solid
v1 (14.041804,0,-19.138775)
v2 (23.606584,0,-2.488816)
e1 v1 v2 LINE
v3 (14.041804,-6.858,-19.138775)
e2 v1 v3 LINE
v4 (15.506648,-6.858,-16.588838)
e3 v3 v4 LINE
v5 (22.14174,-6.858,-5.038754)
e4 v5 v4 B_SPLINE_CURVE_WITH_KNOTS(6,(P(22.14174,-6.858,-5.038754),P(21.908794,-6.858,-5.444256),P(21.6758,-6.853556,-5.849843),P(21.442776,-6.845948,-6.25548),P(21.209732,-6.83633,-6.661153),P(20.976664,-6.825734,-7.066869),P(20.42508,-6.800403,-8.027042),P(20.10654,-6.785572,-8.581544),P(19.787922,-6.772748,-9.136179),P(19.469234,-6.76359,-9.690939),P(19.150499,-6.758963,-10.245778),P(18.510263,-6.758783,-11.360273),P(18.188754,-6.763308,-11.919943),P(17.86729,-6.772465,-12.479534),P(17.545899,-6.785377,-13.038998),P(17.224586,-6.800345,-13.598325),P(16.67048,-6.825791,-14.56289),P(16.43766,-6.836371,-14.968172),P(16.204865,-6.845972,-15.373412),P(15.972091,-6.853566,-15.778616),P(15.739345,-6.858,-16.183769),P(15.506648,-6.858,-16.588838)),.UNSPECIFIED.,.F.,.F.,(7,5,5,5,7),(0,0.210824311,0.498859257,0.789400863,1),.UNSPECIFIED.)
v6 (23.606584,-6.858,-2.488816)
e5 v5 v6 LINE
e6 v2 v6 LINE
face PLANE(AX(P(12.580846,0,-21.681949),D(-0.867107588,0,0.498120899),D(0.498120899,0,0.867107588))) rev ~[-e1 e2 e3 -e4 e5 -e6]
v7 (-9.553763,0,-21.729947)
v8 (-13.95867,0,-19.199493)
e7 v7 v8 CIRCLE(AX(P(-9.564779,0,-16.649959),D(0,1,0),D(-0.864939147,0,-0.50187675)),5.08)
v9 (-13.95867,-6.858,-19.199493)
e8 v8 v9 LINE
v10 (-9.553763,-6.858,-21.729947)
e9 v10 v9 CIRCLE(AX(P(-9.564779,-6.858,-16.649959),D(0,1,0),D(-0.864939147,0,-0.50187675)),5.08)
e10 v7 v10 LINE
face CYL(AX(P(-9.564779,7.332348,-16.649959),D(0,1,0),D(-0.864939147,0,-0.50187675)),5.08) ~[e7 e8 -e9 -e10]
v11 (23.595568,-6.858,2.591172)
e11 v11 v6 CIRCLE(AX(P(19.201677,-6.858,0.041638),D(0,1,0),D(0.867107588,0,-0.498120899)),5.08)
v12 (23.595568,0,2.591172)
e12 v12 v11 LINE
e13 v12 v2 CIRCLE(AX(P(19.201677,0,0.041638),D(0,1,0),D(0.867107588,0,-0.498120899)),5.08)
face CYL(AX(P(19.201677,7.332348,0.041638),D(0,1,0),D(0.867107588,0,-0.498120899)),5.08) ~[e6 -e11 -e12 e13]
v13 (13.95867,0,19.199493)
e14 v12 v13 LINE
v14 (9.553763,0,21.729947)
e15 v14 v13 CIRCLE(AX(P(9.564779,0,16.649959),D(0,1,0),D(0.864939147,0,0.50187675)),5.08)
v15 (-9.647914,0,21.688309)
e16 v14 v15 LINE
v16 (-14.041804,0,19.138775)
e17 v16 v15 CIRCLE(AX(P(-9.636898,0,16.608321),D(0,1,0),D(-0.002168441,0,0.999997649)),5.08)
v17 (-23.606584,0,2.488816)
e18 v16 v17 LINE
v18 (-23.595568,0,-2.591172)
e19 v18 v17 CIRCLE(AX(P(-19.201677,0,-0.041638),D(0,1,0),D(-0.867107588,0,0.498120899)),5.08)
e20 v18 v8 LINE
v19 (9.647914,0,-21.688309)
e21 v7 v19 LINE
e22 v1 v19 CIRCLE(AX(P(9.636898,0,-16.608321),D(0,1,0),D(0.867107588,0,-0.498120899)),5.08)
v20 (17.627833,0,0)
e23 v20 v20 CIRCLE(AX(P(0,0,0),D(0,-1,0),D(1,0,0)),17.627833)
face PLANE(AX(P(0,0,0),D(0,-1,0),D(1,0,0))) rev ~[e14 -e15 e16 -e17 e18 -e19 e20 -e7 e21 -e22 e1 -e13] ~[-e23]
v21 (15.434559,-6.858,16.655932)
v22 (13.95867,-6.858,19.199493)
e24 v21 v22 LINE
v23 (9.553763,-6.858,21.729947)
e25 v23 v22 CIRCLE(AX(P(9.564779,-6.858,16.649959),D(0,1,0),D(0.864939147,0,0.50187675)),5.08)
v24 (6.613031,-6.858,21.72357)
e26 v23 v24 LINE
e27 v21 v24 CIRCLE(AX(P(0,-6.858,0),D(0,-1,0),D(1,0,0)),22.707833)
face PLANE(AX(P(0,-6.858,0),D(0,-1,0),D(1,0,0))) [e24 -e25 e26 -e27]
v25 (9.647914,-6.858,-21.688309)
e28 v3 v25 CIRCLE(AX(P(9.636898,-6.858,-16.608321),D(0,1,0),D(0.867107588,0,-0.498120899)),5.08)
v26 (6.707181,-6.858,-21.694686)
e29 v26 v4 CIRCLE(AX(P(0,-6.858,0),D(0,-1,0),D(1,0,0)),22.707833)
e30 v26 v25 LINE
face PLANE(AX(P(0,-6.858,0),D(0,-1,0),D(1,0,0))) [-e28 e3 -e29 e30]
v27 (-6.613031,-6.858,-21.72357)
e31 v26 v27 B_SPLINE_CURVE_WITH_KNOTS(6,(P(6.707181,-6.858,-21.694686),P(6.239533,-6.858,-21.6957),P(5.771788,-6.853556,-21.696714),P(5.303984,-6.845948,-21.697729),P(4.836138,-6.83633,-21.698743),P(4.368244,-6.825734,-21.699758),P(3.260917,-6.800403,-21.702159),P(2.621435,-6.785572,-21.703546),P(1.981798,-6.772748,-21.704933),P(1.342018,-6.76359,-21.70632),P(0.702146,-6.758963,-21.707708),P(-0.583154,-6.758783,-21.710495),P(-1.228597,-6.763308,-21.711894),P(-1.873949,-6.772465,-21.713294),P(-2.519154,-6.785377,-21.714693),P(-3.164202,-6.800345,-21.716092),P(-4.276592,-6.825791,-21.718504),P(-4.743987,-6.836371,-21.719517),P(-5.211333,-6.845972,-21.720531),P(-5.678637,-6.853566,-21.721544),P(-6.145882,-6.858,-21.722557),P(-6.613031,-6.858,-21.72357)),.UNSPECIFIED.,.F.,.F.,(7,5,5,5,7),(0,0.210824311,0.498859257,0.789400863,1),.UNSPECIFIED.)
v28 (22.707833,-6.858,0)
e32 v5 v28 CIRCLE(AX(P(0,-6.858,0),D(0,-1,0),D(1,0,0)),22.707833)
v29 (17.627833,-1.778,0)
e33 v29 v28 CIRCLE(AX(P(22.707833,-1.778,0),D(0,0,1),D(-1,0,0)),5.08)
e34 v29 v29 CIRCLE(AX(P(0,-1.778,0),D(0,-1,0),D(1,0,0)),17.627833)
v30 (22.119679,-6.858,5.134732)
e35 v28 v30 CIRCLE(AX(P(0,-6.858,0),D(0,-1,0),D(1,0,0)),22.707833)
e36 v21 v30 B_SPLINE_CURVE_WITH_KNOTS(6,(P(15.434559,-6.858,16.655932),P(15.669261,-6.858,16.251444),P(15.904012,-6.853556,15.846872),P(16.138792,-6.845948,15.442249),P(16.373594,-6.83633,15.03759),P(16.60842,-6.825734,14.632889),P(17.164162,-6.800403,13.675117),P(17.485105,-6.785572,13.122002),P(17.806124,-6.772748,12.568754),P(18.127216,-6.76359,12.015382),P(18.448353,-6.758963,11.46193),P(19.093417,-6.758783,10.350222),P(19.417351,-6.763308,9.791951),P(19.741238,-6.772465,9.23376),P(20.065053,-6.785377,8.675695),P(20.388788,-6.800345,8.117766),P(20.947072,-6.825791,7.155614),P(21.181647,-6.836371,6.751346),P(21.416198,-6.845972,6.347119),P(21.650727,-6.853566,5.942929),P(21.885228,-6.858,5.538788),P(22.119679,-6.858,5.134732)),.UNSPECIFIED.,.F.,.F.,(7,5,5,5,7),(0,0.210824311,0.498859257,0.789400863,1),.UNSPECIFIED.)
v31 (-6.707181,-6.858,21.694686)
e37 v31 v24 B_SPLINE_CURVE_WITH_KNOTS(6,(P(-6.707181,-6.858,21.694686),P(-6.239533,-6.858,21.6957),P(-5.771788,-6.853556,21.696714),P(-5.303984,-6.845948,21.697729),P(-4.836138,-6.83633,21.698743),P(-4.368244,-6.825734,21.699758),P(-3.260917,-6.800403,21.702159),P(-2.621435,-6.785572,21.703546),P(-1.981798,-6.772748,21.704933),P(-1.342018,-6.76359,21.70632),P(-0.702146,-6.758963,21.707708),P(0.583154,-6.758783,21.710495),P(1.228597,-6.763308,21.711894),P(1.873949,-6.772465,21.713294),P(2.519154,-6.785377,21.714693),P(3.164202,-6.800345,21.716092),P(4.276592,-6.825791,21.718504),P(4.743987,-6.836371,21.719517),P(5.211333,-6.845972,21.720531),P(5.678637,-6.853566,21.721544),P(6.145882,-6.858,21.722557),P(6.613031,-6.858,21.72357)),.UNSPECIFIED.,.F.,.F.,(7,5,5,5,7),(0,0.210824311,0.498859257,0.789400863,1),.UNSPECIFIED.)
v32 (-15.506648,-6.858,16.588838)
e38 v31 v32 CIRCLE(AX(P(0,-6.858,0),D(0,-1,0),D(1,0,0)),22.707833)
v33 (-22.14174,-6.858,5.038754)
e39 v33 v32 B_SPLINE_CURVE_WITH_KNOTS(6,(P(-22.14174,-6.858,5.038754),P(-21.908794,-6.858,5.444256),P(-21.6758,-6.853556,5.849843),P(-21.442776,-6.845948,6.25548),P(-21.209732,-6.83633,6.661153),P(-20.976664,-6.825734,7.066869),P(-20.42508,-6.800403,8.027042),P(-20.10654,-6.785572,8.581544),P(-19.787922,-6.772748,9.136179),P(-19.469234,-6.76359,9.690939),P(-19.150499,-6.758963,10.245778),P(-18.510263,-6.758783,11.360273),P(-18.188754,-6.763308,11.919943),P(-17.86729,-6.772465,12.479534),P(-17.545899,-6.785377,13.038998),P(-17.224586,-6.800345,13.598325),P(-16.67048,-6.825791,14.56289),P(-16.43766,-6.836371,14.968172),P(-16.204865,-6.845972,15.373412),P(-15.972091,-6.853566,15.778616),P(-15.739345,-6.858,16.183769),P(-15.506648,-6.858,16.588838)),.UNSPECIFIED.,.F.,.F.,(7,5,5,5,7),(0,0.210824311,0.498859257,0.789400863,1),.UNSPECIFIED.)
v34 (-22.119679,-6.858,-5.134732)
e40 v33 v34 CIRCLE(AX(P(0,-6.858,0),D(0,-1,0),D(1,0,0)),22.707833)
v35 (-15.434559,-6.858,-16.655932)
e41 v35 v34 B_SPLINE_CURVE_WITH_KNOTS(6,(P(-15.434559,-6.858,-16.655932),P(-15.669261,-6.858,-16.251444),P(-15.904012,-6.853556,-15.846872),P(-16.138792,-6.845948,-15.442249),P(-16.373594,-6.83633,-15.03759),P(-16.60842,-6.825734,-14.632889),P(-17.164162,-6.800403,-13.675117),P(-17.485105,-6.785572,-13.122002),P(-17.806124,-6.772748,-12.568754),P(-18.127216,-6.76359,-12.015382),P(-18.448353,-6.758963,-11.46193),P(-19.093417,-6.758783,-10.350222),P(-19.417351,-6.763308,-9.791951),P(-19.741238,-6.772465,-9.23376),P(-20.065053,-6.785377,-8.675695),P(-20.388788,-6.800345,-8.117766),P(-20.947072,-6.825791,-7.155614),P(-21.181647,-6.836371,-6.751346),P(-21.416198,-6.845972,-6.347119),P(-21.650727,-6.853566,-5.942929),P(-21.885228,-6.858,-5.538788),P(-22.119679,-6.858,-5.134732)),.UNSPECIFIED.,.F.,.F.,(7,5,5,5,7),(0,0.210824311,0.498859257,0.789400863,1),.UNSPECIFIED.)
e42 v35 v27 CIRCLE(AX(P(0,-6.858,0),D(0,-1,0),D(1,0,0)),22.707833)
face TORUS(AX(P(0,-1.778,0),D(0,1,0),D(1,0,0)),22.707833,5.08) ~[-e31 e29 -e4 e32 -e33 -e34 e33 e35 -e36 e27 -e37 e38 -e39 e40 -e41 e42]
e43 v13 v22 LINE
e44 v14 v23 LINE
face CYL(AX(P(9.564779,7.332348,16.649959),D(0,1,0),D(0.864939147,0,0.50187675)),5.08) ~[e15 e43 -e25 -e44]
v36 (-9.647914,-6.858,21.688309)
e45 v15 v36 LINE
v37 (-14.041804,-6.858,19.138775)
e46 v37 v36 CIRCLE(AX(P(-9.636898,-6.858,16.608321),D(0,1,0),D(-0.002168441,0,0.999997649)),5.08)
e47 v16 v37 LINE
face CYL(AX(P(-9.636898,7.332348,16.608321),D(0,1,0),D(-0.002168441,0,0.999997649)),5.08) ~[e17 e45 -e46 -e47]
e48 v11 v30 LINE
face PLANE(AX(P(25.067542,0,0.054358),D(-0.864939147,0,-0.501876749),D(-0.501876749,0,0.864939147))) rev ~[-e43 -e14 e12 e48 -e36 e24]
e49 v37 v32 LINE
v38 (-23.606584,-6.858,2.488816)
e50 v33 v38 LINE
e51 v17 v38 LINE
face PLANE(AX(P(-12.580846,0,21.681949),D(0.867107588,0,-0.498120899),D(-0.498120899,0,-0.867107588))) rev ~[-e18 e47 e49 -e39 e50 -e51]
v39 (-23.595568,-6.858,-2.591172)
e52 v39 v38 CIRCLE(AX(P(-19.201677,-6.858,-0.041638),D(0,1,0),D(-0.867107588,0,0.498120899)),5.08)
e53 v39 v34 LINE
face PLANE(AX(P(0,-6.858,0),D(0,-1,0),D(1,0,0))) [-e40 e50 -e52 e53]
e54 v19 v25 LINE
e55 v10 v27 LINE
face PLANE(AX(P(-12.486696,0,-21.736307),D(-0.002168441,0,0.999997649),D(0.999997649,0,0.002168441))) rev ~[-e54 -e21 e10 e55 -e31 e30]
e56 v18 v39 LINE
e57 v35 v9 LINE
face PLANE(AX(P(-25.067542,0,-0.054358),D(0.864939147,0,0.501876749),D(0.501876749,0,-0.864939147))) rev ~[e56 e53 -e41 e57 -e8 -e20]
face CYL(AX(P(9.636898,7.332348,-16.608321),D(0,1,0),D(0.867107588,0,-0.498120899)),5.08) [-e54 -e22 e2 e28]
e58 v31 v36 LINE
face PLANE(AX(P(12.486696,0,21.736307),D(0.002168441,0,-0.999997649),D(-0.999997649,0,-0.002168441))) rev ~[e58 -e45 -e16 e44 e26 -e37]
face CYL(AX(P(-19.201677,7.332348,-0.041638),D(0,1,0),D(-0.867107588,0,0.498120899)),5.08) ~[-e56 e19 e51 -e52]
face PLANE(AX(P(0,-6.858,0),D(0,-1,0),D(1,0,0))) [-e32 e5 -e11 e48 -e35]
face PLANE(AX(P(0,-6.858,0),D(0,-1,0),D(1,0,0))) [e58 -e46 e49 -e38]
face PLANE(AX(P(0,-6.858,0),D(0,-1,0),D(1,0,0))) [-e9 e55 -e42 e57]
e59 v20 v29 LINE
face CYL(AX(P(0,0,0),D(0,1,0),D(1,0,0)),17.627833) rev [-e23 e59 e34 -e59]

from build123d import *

# Parameters (mm, degrees)
F0_R        = 17.6278331086
F1_DEPTH    = 6.858
F2_T1_DEPTH = 21.5226968374


# Not quite as in the source:
# - a fillet or chamfer that OpenCascade refuses, or shapes differently, is made with other operations: its cross-section is extruded or revolved along the edge and cut away or added


with BuildPart() as f1:
    # F0 (on Front) → F1 (new body)
    with BuildSketch(Plane.XZ):
        Polygon((25.0675420445, 0.0543576147), (12.486695947, 21.7363070283), (-12.5808460975, 21.6819494136), (-25.0675420445, -0.0543576147), (-12.486695947, -21.7363070283), (12.5808460975, -21.6819494136), align=None)
        Circle(F0_R, mode=Mode.SUBTRACT)
    extrude(amount=F1_DEPTH)

    # F2: fillet of radius 5.08 on 7 edges, made by hand

    # F2_s2 → F2_t1 (cut)
    with BuildSketch(Plane.XZ.offset(-7.3323484187)):
        with BuildLine():
            ThreePointArc((-23.6065836488, 2.4888163666), (-24.2816651572, -0.052653483), (-23.5955679683, -2.5911716899))
            Line((-23.5955679683, -2.5911716899), (-25.0675420445, -0.0543576147))
            Line((-25.0675420445, -0.0543576147), (-23.6065836488, 2.4888163666))
        make_face()
        with BuildLine():
            ThreePointArc((-13.9586700232, -19.1994929531), (-12.0952333247, -21.0548656138), (-9.5537634751, -21.7299471223))
            Line((-9.5537634751, -21.7299471223), (-12.486695947, -21.7363070283))
            Line((-12.486695947, -21.7363070283), (-13.9586700232, -19.1994929531))
        make_face()
        with BuildLine():
            ThreePointArc((14.0418044932, -19.1387754323), (12.1864318325, -21.0022121308), (9.6479136256, -21.6883093197))
            Line((9.6479136256, -21.6883093197), (12.5808460975, -21.6819494136))
            Line((12.5808460975, -21.6819494136), (14.0418044932, -19.1387754323))
        make_face()
        with BuildLine():
            ThreePointArc((23.6065836488, -2.4888163666), (24.2816651572, 0.052653483), (23.5955679683, 2.5911716899))
            Line((23.5955679683, 2.5911716899), (25.0675420445, 0.0543576147))
            Line((25.0675420445, 0.0543576147), (23.6065836488, -2.4888163666))
        make_face()
        with BuildLine():
            ThreePointArc((13.9586700232, 19.1994929531), (12.0952333247, 21.0548656138), (9.5537634751, 21.7299471223))
            Line((9.5537634751, 21.7299471223), (12.486695947, 21.7363070283))
            Line((12.486695947, 21.7363070283), (13.9586700232, 19.1994929531))
        make_face()
        with BuildLine():
            ThreePointArc((-9.6479136256, 21.6883093197), (-12.1864318325, 21.0022121308), (-14.0418044932, 19.1387754323))
            Line((-14.0418044932, 19.1387754323), (-12.5808460975, 21.6819494136))
            Line((-12.5808460975, 21.6819494136), (-9.6479136256, 21.6883093197))
        make_face()
    extrude(amount=F2_T1_DEPTH, mode=Mode.SUBTRACT)

    # F2_s3 → F2_t4 (revolve, cut)
    with BuildSketch(Plane.XY):
        with BuildLine():
            ThreePointArc((17.6278331086, -1.778), (19.1157306602, -5.3701024484), (22.7078331086, -6.858))
            Line((22.7078331086, -6.858), (17.6278331086, -6.858))
            Line((17.6278331086, -6.858), (17.6278331086, -1.778))
        make_face()
    revolve(axis=Axis((0, -6.858, 0), (0, -1, 0)), mode=Mode.SUBTRACT)


solid = f1.part
